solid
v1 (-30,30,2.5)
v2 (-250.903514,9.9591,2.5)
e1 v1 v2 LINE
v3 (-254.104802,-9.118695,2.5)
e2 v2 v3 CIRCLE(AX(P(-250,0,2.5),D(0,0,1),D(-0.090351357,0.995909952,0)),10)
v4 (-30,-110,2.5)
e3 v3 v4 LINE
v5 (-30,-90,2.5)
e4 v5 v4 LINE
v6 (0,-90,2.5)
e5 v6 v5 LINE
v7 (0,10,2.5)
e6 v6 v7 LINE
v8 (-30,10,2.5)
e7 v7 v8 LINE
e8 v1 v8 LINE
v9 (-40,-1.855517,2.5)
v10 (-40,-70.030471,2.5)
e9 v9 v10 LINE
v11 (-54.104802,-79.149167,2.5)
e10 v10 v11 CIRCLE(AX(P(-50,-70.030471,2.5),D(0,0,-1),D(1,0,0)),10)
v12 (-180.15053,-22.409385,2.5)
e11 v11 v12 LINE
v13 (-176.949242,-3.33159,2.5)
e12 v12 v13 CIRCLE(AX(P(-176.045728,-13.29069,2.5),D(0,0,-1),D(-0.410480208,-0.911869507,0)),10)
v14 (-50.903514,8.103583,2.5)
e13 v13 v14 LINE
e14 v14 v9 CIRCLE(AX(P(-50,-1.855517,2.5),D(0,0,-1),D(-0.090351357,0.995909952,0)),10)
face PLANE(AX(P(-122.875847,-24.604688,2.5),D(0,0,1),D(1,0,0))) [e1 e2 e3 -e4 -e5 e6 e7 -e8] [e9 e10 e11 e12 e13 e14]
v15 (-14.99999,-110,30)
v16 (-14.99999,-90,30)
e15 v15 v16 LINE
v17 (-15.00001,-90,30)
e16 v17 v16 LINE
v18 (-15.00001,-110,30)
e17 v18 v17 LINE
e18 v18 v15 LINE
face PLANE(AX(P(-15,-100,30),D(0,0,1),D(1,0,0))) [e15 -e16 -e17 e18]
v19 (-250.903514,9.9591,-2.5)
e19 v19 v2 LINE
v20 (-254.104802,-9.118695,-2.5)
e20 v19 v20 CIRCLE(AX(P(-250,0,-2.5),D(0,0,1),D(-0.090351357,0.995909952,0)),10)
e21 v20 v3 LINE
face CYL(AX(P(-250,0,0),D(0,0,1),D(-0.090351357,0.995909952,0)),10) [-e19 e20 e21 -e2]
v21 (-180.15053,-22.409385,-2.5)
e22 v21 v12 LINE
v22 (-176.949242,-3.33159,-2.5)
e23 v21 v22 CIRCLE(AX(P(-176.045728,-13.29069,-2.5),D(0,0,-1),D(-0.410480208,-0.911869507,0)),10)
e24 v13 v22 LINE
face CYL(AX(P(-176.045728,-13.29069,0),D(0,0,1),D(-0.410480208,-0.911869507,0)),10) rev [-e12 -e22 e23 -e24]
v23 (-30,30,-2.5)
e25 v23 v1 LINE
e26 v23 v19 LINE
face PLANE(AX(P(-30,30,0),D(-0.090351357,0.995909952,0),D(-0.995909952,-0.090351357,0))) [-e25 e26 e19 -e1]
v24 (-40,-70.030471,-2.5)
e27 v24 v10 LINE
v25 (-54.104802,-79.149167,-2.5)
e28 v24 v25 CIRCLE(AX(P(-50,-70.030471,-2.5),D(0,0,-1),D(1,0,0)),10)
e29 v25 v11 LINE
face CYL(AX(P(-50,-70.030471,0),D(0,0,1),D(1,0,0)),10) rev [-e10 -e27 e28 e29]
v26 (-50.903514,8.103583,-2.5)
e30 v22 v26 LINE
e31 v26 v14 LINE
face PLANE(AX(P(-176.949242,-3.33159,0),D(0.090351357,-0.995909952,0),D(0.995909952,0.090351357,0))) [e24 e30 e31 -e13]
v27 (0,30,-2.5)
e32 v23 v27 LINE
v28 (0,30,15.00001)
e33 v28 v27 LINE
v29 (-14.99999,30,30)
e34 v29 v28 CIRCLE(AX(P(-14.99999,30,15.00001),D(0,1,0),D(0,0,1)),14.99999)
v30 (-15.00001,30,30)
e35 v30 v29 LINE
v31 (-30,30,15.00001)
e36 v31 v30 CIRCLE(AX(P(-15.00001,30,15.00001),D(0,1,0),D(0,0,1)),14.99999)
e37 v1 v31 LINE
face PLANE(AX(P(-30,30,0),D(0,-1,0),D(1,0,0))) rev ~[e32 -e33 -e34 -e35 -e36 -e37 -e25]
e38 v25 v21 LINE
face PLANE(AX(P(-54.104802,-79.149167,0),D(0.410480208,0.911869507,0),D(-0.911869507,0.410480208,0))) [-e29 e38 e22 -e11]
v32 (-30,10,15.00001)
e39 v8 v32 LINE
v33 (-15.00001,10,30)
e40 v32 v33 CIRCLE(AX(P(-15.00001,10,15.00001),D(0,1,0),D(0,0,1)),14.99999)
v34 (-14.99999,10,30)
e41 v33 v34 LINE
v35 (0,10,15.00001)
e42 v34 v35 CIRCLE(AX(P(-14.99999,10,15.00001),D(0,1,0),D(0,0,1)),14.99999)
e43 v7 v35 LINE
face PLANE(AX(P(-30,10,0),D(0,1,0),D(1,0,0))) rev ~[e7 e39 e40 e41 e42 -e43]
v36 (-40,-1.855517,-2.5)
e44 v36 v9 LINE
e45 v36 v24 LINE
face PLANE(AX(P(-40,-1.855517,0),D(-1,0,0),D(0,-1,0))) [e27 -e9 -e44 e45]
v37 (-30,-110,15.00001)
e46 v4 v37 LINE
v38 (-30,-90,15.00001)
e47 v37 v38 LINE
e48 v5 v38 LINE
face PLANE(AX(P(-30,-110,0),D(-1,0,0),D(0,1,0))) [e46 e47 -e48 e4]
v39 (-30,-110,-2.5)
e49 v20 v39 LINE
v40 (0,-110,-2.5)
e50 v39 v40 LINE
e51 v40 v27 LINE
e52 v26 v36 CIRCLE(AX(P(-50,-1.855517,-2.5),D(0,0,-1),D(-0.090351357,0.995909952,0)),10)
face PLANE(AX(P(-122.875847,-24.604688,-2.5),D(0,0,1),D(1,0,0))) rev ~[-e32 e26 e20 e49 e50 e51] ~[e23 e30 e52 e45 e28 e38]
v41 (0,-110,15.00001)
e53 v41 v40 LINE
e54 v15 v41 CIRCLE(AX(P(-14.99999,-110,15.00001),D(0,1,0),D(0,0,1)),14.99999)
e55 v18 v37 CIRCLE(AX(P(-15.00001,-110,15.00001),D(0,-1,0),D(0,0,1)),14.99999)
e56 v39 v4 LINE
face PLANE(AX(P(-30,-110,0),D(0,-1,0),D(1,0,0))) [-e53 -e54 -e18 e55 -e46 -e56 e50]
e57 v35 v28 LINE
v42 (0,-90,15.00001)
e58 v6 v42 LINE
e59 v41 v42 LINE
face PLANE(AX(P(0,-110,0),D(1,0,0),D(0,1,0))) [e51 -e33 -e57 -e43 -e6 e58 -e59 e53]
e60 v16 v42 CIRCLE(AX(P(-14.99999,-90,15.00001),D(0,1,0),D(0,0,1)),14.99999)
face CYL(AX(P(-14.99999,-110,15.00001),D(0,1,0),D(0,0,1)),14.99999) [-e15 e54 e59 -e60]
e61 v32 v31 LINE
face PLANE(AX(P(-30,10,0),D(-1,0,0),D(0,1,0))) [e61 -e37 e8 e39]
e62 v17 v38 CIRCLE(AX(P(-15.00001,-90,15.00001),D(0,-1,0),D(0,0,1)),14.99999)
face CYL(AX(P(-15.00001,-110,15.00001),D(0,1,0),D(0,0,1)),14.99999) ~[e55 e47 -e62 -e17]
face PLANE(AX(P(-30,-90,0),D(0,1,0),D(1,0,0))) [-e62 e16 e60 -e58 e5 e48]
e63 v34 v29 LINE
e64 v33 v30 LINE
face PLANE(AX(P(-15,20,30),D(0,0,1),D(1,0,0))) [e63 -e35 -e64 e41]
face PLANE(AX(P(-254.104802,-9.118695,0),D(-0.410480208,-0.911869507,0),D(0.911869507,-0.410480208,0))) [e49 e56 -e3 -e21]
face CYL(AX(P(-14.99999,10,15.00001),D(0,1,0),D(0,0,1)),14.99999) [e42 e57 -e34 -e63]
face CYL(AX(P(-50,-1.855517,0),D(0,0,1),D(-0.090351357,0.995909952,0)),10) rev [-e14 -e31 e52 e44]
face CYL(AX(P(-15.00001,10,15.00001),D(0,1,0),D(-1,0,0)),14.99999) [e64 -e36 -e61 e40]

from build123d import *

# Parameters (mm, degrees)
F0_W     = 30
F0_H     = 20
F0_H_2   = 100
F1_DEPTH = 2.5
F2_DEPTH = 30
F3_R     = 14.99999


# Not quite as in the source:
# - a fillet or chamfer is up to 0.001 mm smaller than in the source, because OpenCascade refuses the exact size


with BuildPart() as f1:
    # F0 (on Top) → F1 (new body, symmetric)
    with BuildSketch(Plane.XY):
        with BuildLine():
            Line((-30, 10), (-30, 30))
            Line((-30, 30), (-250.9035135708, 9.9590995189))
            ThreePointArc((-250.9035135708, 9.9590995189), (-243.2559335601, 7.3836012794), (-240, 0))
            ThreePointArc((-240, 0), (-244.5708205421, -8.3978574895), (-254.1048020827, -9.1186950745))
            Line((-254.1048020827, -9.1186950745), (-30, -110))
            Line((-30, -110), (-30, -90))
            Line((-30, -90), (-30, 10))
        make_face()
        with BuildLine():
            ThreePointArc((-50.9035135708, 8.1035827434), (-43.2559335601, 5.5280845039), (-40, -1.8555167755))
            Line((-40, -1.8555167755), (-40, -70.0304714473))
            ThreePointArc((-40, -70.0304714473), (-44.5708205421, -78.4283289367), (-54.1048020827, -79.1491665218))
            Line((-54.1048020827, -79.1491665218), (-180.1505302804, -22.409384854))
            ThreePointArc((-180.1505302804, -22.409384854), (-185.9078460259, -11.6358085325), (-176.9492417684, -3.3315902606))
            Line((-176.9492417684, -3.3315902606), (-50.9035135708, 8.1035827434))
        make_face(mode=Mode.SUBTRACT)
        with BuildLine():
            ThreePointArc((-240, 0), (-243.2559335601, 7.3836012794), (-250.9035135708, 9.9590995189))
            ThreePointArc((-250.9035135708, 9.9590995189), (-259.8621178282, 1.654881247), (-254.1048020827, -9.1186950745))
            ThreePointArc((-254.1048020827, -9.1186950745), (-244.5708205421, -8.3978574895), (-240, 0))
        make_face()
        with Locations((-15, 20)):
            Rectangle(F0_W, F0_H)
        with Locations((-15, -40)):
            Rectangle(F0_W, F0_H_2)
        with Locations((-15, -100)):
            Rectangle(F0_W, F0_H)
    extrude(amount=F1_DEPTH, both=True)

    # F0 (on Top) → F2 (join)
    with BuildSketch(Plane.XY):
        with Locations((-15, 20)):
            Rectangle(F0_W, F0_H)
        with Locations((-15, -100)):
            Rectangle(F0_W, F0_H)
    extrude(amount=F2_DEPTH)

    # F3 (radius 15 in the source; OpenCascade refuses exactly that, so slightly less here)
    f3_edges = [f1.edges().sort_by_distance(p)[0] for p in [
        (0, 20, 30),
        (-30, 20, 30),
        (0, -100, 30),
        (-30, -100, 30),
    ]]
    fillet(f3_edges, radius=F3_R)


solid = f1.part
